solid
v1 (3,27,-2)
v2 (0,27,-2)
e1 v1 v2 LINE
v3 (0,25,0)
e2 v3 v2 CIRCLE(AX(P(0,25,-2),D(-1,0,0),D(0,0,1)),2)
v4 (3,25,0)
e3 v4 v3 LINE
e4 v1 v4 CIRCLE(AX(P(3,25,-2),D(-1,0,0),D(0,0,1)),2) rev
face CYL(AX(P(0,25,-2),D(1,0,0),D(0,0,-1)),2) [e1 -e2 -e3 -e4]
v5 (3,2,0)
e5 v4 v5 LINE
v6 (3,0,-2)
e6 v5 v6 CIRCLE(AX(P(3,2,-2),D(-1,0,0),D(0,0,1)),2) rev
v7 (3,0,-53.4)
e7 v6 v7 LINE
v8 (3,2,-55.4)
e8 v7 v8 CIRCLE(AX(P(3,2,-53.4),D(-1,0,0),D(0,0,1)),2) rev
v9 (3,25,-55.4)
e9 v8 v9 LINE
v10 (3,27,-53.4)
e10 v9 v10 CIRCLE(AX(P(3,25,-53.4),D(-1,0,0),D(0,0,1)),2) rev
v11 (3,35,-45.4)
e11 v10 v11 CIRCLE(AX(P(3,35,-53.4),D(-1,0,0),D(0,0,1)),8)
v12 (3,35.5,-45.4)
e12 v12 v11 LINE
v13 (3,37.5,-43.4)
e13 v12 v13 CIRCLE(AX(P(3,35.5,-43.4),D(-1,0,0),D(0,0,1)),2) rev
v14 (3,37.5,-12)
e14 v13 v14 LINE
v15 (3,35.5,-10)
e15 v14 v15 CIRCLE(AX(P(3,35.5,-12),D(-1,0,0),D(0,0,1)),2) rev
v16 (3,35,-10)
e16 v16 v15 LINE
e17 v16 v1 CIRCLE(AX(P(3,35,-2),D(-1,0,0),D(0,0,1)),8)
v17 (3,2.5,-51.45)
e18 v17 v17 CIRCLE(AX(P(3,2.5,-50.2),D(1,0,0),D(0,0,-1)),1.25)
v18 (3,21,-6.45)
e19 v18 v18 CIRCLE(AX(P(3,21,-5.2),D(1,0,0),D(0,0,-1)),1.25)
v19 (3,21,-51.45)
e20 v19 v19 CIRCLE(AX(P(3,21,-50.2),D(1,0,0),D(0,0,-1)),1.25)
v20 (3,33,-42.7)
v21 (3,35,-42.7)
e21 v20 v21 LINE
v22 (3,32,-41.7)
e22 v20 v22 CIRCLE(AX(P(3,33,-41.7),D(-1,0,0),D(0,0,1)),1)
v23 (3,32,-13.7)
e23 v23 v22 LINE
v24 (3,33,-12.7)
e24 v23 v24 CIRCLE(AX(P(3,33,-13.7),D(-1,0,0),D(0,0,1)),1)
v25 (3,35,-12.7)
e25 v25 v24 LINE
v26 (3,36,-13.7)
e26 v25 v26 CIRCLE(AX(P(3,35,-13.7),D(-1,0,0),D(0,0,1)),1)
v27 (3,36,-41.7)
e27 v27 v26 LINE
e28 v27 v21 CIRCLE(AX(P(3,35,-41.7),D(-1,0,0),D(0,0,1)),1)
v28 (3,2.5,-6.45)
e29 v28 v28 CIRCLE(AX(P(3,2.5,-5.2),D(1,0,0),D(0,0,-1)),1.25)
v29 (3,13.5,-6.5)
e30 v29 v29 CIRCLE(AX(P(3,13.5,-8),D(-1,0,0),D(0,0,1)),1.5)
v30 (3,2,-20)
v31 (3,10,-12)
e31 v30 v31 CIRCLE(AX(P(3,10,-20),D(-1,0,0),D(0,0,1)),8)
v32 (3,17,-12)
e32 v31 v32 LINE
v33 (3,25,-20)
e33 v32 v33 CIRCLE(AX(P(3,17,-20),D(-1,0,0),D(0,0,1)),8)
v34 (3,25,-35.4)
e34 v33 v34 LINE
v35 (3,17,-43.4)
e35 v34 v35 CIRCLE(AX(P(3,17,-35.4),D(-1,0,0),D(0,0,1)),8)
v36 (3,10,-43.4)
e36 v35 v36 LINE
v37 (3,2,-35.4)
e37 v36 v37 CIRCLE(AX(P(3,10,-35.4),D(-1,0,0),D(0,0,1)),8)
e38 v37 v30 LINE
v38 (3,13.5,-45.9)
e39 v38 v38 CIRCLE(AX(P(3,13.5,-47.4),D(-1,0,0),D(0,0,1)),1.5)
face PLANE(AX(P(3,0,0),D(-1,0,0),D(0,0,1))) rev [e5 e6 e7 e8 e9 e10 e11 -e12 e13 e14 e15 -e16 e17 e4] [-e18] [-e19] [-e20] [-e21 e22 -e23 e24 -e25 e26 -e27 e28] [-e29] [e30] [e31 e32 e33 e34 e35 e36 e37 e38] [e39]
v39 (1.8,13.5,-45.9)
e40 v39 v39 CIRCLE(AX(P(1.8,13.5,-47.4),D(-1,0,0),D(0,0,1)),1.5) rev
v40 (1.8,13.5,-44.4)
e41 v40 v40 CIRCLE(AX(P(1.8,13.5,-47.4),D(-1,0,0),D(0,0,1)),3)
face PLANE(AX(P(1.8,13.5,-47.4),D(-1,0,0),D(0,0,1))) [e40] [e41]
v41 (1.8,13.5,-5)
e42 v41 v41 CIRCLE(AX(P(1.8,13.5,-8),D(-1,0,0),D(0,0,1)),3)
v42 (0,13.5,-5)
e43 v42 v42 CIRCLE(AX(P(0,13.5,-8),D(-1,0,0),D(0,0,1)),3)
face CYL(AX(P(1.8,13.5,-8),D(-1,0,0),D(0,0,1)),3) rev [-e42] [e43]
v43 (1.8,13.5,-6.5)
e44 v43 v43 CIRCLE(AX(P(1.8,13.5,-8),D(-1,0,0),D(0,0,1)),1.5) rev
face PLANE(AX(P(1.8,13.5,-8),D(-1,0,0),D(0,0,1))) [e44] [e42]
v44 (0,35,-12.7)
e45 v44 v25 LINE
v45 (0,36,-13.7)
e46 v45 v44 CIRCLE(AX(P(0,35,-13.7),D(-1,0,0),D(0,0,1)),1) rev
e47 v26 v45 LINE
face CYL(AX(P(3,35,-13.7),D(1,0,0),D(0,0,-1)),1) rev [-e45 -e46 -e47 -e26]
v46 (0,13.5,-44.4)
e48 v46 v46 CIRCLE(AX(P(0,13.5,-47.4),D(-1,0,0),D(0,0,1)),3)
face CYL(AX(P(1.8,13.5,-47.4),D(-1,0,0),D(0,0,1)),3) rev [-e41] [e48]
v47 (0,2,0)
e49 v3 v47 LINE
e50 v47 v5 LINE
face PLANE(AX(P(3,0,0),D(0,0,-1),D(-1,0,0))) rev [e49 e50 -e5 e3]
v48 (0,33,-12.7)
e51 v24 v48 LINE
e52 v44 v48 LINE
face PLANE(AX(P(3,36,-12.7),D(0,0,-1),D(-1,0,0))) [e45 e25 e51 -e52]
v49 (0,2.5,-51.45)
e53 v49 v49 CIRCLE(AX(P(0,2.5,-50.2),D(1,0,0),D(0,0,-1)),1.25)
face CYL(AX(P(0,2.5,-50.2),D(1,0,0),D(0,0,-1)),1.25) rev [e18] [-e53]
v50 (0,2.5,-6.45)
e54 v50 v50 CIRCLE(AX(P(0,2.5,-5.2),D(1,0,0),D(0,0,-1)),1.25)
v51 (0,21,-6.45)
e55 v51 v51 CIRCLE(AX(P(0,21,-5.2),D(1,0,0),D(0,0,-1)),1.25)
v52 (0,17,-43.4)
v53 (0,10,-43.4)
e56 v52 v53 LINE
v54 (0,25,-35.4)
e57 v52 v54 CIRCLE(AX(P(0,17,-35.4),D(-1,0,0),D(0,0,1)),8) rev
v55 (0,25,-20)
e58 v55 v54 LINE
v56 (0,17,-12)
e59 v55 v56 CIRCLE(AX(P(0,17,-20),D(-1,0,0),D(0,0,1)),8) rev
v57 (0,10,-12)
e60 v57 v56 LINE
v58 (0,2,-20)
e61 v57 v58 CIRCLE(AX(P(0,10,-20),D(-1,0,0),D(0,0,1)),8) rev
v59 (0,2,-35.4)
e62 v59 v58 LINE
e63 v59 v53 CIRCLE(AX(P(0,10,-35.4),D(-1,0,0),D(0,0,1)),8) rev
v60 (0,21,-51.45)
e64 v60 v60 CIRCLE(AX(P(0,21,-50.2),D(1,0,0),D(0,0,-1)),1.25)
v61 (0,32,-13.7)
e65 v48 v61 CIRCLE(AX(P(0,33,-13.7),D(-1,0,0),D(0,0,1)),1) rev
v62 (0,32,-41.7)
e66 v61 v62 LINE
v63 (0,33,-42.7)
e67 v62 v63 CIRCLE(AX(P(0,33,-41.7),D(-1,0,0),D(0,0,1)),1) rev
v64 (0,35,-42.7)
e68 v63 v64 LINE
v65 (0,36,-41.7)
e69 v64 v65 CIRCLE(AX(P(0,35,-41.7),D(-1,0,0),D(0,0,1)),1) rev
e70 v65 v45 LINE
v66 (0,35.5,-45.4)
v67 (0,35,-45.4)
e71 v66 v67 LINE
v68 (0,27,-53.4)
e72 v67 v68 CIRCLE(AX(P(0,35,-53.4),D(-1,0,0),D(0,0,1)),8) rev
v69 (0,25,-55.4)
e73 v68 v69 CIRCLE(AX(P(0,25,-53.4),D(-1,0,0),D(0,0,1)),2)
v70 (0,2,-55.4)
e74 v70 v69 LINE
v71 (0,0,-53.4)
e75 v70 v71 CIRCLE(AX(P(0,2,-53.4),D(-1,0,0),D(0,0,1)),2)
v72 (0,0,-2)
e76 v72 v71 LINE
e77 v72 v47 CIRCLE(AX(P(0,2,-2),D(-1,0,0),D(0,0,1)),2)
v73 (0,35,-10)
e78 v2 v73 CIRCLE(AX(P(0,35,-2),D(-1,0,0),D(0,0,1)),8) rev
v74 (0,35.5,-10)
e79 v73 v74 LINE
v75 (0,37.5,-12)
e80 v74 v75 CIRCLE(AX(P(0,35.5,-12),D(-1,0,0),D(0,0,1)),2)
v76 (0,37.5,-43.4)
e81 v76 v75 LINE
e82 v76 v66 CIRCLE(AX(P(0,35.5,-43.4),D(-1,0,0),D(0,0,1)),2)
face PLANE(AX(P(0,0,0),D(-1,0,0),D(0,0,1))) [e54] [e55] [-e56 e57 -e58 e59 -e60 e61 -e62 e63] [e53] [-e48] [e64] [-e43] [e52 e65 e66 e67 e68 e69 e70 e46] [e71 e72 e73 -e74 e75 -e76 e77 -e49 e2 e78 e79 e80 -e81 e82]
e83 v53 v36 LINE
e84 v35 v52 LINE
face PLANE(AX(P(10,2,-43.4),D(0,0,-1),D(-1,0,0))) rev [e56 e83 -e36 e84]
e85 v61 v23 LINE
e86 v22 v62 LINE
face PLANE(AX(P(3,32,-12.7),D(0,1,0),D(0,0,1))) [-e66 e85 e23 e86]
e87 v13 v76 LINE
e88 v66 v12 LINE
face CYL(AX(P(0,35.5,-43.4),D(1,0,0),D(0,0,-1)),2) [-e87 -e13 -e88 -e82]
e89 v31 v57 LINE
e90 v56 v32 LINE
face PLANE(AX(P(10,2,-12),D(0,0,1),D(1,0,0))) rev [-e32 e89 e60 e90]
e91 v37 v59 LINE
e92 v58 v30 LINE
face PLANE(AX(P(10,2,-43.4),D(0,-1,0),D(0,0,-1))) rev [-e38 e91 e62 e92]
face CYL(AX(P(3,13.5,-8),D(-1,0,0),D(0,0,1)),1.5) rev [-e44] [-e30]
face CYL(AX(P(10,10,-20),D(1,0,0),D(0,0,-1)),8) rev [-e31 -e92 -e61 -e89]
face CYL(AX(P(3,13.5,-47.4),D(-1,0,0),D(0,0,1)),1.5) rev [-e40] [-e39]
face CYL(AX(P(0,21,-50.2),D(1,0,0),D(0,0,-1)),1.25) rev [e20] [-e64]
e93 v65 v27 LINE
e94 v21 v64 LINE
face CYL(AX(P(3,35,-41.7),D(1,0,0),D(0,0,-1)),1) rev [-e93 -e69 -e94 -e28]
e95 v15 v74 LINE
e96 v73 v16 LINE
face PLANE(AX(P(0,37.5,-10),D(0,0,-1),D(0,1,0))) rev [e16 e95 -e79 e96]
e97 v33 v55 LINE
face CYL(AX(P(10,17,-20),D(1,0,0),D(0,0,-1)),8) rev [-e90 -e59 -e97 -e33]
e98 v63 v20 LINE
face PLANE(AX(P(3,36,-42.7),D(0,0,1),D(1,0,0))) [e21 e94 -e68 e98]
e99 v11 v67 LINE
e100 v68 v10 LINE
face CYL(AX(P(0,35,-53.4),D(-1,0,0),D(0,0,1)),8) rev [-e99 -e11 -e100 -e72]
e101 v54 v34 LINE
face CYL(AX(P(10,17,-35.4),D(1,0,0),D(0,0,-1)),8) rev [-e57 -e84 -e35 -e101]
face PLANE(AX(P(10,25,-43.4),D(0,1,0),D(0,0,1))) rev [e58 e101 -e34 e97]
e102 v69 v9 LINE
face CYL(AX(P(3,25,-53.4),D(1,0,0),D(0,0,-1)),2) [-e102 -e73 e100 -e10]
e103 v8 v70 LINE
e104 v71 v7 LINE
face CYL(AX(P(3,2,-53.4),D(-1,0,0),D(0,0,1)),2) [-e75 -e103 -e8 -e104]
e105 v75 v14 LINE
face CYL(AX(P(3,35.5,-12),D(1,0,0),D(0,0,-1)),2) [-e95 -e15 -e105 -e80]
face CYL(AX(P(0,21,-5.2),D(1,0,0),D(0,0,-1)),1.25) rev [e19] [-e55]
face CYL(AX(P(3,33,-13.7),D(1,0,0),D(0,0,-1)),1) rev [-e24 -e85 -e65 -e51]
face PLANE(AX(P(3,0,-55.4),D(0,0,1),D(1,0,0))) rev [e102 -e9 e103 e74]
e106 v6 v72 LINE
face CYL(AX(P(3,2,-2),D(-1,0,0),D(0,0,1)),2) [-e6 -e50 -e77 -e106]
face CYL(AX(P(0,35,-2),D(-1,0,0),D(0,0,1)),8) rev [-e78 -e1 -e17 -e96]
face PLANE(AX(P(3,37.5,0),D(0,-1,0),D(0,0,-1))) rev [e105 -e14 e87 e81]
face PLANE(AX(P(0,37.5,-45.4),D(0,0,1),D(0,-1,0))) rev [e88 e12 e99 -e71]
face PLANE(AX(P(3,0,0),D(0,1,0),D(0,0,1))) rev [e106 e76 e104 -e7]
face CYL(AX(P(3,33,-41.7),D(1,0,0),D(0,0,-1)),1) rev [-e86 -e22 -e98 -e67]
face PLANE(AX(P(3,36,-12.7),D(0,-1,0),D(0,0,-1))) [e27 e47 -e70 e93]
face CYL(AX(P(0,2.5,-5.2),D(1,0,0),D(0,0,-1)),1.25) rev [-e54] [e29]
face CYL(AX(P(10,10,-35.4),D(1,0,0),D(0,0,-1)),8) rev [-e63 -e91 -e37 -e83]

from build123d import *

# Parameters (mm, degrees)
SKETCH_1_W             = 55.4
SKETCH_1_H             = 37.5
SKETCH_1_W_2           = 30
SKETCH_1_H_2           = 4
EXTRUDE_1_DEPTH        = 3
SKETCH_2_R             = 1.25
CUT_EXTRUDE_1_DEPTH    = 67.965737508
SKETCH_3_W             = 10
SKETCH_3_H             = 10.5
CUT_EXTRUDE_2_DEPTH    = 67.965737508
FILLET_2_R             = 1
FILLET_3_R             = 2
SKETCH_6_R             = 1.5
CUT_EXTRUDE_4_DEPTH    = 67.965737508
SKETCH_7_R             = 3
CUT_EXTRUDE_5_DEPTH    = 1.8
FILLET_4_R             = 8
SKETCH_10_W            = 31.4
SKETCH_10_H            = 23
CUT_EXTRUDE_6_DEPTH    = 10
FILLET_5_R             = 8
FILLET_6_R             = 2
HOLE_WIZARD_M3_1_D     = 2.5
HOLE_WIZARD_M3_1_DEPTH = 3
HOLE_WIZARD_M3_1_TIP   = 0.751075774


with BuildPart() as part:
    # 草图1 → 凸台-拉伸1 (new body)
    with BuildSketch(Plane(origin=(0, 0, 0), x_dir=(0, 0, -1), z_dir=(1, 0, 0))):
        with Locations((27.7, 18.75)):
            Rectangle(SKETCH_1_W, SKETCH_1_H)
        with Locations((27.7, 34)):
            Rectangle(SKETCH_1_W_2, SKETCH_1_H_2, mode=Mode.SUBTRACT)
    extrude(amount=EXTRUDE_1_DEPTH)

    # 草图2 → 切除-拉伸1 (cut, through all)
    with BuildSketch(Plane(origin=(3, 0, 0), x_dir=(0, 0, -1), z_dir=(1, 0, 0))):
        with Locations((5.2, 21)):
            Circle(SKETCH_2_R)
        with Locations((5.2, 2.5)):
            Circle(SKETCH_2_R)
        with Locations((50.2, 21)):
            Circle(SKETCH_2_R)
        with Locations((50.2, 2.5)):
            Circle(SKETCH_2_R)
    extrude(amount=-CUT_EXTRUDE_1_DEPTH, mode=Mode.SUBTRACT)

    # 草图3 → 切除-拉伸2 (cut, through all)
    with BuildSketch(Plane(origin=(3, 0, 0), x_dir=(0, 0, -1), z_dir=(1, 0, 0))):
        with Locations((5, 32.25)):
            Rectangle(SKETCH_3_W, SKETCH_3_H)
        with Locations((50.4, 32.25)):
            Rectangle(SKETCH_3_W, SKETCH_3_H)
    extrude(amount=-CUT_EXTRUDE_2_DEPTH, mode=Mode.SUBTRACT)

    # 圆角2
    fillet_2_edges = [part.edges().sort_by_distance(p)[0] for p in [
        (1.5, 36, -12.7),
        (1.5, 32, -12.7),
        (1.5, 32, -42.7),
        (1.5, 36, -42.7),
    ]]
    fillet(fillet_2_edges, radius=FILLET_2_R)

    # 圆角3
    fillet_3_edges = [part.edges().sort_by_distance(p)[0] for p in [
        (1.5, 37.5, -10),
        (1.5, 37.5, -45.4),
    ]]
    fillet(fillet_3_edges, radius=FILLET_3_R)

    # 草图6 → 切除-拉伸4 (cut, through all)
    with BuildSketch(Plane.ZY):
        with Locations((-47.4, 13.5)):
            Circle(SKETCH_6_R)
        with Locations((-8, 13.5)):
            Circle(SKETCH_6_R)
    extrude(amount=-CUT_EXTRUDE_4_DEPTH, mode=Mode.SUBTRACT)

    # 草图7 → 切除-拉伸5 (cut)
    with BuildSketch(Plane.ZY):
        with Locations((-47.4, 13.5)):
            Circle(SKETCH_7_R)
        with Locations((-8, 13.5)):
            Circle(SKETCH_7_R)
    extrude(amount=-CUT_EXTRUDE_5_DEPTH, mode=Mode.SUBTRACT)

    # 圆角4
    fillet_4_edges = [part.edges().sort_by_distance(p)[0] for p in [
        (1.5, 27, -10),
        (1.5, 27, -45.4),
    ]]
    fillet(fillet_4_edges, radius=FILLET_4_R)

    # 草图10 → 切除-拉伸6 (cut)
    with BuildSketch(Plane.ZY):
        with Locations((-27.7, 13.5)):
            Rectangle(SKETCH_10_W, SKETCH_10_H)
    extrude(amount=-CUT_EXTRUDE_6_DEPTH, mode=Mode.SUBTRACT)

    # 圆角5
    fillet_5_edges = [part.edges().sort_by_distance(p)[0] for p in [
        (1.5, 25, -12),
        (1.5, 2, -12),
        (1.5, 2, -43.4),
        (1.5, 25, -43.4),
    ]]
    fillet(fillet_5_edges, radius=FILLET_5_R)

    # 圆角6
    fillet_6_edges = [part.edges().sort_by_distance(p)[0] for p in [
        (1.5, 27, -55.4),
        (1.5, 0, -55.4),
        (1.5, 0, 0),
        (1.5, 27, 0),
    ]]
    fillet(fillet_6_edges, radius=FILLET_6_R - 0.0001)  # a hair under: the kernel refuses the full size

    # M3 螺纹孔1
    with Locations(Plane(origin=(0, 21, -50.2), x_dir=(0, 0, -1), z_dir=(-1, 0, 0))):
        with Locations((0, 0), (0, 18.5), (-45, 18.5), (-45, 0)):
            Hole(HOLE_WIZARD_M3_1_D / 2, depth=HOLE_WIZARD_M3_1_DEPTH)
            with Locations((0, 0, -(HOLE_WIZARD_M3_1_DEPTH + HOLE_WIZARD_M3_1_TIP / 2))):  # 118° drill point
                Cone(0, HOLE_WIZARD_M3_1_D / 2, HOLE_WIZARD_M3_1_TIP, mode=Mode.SUBTRACT)


solid = part.part
